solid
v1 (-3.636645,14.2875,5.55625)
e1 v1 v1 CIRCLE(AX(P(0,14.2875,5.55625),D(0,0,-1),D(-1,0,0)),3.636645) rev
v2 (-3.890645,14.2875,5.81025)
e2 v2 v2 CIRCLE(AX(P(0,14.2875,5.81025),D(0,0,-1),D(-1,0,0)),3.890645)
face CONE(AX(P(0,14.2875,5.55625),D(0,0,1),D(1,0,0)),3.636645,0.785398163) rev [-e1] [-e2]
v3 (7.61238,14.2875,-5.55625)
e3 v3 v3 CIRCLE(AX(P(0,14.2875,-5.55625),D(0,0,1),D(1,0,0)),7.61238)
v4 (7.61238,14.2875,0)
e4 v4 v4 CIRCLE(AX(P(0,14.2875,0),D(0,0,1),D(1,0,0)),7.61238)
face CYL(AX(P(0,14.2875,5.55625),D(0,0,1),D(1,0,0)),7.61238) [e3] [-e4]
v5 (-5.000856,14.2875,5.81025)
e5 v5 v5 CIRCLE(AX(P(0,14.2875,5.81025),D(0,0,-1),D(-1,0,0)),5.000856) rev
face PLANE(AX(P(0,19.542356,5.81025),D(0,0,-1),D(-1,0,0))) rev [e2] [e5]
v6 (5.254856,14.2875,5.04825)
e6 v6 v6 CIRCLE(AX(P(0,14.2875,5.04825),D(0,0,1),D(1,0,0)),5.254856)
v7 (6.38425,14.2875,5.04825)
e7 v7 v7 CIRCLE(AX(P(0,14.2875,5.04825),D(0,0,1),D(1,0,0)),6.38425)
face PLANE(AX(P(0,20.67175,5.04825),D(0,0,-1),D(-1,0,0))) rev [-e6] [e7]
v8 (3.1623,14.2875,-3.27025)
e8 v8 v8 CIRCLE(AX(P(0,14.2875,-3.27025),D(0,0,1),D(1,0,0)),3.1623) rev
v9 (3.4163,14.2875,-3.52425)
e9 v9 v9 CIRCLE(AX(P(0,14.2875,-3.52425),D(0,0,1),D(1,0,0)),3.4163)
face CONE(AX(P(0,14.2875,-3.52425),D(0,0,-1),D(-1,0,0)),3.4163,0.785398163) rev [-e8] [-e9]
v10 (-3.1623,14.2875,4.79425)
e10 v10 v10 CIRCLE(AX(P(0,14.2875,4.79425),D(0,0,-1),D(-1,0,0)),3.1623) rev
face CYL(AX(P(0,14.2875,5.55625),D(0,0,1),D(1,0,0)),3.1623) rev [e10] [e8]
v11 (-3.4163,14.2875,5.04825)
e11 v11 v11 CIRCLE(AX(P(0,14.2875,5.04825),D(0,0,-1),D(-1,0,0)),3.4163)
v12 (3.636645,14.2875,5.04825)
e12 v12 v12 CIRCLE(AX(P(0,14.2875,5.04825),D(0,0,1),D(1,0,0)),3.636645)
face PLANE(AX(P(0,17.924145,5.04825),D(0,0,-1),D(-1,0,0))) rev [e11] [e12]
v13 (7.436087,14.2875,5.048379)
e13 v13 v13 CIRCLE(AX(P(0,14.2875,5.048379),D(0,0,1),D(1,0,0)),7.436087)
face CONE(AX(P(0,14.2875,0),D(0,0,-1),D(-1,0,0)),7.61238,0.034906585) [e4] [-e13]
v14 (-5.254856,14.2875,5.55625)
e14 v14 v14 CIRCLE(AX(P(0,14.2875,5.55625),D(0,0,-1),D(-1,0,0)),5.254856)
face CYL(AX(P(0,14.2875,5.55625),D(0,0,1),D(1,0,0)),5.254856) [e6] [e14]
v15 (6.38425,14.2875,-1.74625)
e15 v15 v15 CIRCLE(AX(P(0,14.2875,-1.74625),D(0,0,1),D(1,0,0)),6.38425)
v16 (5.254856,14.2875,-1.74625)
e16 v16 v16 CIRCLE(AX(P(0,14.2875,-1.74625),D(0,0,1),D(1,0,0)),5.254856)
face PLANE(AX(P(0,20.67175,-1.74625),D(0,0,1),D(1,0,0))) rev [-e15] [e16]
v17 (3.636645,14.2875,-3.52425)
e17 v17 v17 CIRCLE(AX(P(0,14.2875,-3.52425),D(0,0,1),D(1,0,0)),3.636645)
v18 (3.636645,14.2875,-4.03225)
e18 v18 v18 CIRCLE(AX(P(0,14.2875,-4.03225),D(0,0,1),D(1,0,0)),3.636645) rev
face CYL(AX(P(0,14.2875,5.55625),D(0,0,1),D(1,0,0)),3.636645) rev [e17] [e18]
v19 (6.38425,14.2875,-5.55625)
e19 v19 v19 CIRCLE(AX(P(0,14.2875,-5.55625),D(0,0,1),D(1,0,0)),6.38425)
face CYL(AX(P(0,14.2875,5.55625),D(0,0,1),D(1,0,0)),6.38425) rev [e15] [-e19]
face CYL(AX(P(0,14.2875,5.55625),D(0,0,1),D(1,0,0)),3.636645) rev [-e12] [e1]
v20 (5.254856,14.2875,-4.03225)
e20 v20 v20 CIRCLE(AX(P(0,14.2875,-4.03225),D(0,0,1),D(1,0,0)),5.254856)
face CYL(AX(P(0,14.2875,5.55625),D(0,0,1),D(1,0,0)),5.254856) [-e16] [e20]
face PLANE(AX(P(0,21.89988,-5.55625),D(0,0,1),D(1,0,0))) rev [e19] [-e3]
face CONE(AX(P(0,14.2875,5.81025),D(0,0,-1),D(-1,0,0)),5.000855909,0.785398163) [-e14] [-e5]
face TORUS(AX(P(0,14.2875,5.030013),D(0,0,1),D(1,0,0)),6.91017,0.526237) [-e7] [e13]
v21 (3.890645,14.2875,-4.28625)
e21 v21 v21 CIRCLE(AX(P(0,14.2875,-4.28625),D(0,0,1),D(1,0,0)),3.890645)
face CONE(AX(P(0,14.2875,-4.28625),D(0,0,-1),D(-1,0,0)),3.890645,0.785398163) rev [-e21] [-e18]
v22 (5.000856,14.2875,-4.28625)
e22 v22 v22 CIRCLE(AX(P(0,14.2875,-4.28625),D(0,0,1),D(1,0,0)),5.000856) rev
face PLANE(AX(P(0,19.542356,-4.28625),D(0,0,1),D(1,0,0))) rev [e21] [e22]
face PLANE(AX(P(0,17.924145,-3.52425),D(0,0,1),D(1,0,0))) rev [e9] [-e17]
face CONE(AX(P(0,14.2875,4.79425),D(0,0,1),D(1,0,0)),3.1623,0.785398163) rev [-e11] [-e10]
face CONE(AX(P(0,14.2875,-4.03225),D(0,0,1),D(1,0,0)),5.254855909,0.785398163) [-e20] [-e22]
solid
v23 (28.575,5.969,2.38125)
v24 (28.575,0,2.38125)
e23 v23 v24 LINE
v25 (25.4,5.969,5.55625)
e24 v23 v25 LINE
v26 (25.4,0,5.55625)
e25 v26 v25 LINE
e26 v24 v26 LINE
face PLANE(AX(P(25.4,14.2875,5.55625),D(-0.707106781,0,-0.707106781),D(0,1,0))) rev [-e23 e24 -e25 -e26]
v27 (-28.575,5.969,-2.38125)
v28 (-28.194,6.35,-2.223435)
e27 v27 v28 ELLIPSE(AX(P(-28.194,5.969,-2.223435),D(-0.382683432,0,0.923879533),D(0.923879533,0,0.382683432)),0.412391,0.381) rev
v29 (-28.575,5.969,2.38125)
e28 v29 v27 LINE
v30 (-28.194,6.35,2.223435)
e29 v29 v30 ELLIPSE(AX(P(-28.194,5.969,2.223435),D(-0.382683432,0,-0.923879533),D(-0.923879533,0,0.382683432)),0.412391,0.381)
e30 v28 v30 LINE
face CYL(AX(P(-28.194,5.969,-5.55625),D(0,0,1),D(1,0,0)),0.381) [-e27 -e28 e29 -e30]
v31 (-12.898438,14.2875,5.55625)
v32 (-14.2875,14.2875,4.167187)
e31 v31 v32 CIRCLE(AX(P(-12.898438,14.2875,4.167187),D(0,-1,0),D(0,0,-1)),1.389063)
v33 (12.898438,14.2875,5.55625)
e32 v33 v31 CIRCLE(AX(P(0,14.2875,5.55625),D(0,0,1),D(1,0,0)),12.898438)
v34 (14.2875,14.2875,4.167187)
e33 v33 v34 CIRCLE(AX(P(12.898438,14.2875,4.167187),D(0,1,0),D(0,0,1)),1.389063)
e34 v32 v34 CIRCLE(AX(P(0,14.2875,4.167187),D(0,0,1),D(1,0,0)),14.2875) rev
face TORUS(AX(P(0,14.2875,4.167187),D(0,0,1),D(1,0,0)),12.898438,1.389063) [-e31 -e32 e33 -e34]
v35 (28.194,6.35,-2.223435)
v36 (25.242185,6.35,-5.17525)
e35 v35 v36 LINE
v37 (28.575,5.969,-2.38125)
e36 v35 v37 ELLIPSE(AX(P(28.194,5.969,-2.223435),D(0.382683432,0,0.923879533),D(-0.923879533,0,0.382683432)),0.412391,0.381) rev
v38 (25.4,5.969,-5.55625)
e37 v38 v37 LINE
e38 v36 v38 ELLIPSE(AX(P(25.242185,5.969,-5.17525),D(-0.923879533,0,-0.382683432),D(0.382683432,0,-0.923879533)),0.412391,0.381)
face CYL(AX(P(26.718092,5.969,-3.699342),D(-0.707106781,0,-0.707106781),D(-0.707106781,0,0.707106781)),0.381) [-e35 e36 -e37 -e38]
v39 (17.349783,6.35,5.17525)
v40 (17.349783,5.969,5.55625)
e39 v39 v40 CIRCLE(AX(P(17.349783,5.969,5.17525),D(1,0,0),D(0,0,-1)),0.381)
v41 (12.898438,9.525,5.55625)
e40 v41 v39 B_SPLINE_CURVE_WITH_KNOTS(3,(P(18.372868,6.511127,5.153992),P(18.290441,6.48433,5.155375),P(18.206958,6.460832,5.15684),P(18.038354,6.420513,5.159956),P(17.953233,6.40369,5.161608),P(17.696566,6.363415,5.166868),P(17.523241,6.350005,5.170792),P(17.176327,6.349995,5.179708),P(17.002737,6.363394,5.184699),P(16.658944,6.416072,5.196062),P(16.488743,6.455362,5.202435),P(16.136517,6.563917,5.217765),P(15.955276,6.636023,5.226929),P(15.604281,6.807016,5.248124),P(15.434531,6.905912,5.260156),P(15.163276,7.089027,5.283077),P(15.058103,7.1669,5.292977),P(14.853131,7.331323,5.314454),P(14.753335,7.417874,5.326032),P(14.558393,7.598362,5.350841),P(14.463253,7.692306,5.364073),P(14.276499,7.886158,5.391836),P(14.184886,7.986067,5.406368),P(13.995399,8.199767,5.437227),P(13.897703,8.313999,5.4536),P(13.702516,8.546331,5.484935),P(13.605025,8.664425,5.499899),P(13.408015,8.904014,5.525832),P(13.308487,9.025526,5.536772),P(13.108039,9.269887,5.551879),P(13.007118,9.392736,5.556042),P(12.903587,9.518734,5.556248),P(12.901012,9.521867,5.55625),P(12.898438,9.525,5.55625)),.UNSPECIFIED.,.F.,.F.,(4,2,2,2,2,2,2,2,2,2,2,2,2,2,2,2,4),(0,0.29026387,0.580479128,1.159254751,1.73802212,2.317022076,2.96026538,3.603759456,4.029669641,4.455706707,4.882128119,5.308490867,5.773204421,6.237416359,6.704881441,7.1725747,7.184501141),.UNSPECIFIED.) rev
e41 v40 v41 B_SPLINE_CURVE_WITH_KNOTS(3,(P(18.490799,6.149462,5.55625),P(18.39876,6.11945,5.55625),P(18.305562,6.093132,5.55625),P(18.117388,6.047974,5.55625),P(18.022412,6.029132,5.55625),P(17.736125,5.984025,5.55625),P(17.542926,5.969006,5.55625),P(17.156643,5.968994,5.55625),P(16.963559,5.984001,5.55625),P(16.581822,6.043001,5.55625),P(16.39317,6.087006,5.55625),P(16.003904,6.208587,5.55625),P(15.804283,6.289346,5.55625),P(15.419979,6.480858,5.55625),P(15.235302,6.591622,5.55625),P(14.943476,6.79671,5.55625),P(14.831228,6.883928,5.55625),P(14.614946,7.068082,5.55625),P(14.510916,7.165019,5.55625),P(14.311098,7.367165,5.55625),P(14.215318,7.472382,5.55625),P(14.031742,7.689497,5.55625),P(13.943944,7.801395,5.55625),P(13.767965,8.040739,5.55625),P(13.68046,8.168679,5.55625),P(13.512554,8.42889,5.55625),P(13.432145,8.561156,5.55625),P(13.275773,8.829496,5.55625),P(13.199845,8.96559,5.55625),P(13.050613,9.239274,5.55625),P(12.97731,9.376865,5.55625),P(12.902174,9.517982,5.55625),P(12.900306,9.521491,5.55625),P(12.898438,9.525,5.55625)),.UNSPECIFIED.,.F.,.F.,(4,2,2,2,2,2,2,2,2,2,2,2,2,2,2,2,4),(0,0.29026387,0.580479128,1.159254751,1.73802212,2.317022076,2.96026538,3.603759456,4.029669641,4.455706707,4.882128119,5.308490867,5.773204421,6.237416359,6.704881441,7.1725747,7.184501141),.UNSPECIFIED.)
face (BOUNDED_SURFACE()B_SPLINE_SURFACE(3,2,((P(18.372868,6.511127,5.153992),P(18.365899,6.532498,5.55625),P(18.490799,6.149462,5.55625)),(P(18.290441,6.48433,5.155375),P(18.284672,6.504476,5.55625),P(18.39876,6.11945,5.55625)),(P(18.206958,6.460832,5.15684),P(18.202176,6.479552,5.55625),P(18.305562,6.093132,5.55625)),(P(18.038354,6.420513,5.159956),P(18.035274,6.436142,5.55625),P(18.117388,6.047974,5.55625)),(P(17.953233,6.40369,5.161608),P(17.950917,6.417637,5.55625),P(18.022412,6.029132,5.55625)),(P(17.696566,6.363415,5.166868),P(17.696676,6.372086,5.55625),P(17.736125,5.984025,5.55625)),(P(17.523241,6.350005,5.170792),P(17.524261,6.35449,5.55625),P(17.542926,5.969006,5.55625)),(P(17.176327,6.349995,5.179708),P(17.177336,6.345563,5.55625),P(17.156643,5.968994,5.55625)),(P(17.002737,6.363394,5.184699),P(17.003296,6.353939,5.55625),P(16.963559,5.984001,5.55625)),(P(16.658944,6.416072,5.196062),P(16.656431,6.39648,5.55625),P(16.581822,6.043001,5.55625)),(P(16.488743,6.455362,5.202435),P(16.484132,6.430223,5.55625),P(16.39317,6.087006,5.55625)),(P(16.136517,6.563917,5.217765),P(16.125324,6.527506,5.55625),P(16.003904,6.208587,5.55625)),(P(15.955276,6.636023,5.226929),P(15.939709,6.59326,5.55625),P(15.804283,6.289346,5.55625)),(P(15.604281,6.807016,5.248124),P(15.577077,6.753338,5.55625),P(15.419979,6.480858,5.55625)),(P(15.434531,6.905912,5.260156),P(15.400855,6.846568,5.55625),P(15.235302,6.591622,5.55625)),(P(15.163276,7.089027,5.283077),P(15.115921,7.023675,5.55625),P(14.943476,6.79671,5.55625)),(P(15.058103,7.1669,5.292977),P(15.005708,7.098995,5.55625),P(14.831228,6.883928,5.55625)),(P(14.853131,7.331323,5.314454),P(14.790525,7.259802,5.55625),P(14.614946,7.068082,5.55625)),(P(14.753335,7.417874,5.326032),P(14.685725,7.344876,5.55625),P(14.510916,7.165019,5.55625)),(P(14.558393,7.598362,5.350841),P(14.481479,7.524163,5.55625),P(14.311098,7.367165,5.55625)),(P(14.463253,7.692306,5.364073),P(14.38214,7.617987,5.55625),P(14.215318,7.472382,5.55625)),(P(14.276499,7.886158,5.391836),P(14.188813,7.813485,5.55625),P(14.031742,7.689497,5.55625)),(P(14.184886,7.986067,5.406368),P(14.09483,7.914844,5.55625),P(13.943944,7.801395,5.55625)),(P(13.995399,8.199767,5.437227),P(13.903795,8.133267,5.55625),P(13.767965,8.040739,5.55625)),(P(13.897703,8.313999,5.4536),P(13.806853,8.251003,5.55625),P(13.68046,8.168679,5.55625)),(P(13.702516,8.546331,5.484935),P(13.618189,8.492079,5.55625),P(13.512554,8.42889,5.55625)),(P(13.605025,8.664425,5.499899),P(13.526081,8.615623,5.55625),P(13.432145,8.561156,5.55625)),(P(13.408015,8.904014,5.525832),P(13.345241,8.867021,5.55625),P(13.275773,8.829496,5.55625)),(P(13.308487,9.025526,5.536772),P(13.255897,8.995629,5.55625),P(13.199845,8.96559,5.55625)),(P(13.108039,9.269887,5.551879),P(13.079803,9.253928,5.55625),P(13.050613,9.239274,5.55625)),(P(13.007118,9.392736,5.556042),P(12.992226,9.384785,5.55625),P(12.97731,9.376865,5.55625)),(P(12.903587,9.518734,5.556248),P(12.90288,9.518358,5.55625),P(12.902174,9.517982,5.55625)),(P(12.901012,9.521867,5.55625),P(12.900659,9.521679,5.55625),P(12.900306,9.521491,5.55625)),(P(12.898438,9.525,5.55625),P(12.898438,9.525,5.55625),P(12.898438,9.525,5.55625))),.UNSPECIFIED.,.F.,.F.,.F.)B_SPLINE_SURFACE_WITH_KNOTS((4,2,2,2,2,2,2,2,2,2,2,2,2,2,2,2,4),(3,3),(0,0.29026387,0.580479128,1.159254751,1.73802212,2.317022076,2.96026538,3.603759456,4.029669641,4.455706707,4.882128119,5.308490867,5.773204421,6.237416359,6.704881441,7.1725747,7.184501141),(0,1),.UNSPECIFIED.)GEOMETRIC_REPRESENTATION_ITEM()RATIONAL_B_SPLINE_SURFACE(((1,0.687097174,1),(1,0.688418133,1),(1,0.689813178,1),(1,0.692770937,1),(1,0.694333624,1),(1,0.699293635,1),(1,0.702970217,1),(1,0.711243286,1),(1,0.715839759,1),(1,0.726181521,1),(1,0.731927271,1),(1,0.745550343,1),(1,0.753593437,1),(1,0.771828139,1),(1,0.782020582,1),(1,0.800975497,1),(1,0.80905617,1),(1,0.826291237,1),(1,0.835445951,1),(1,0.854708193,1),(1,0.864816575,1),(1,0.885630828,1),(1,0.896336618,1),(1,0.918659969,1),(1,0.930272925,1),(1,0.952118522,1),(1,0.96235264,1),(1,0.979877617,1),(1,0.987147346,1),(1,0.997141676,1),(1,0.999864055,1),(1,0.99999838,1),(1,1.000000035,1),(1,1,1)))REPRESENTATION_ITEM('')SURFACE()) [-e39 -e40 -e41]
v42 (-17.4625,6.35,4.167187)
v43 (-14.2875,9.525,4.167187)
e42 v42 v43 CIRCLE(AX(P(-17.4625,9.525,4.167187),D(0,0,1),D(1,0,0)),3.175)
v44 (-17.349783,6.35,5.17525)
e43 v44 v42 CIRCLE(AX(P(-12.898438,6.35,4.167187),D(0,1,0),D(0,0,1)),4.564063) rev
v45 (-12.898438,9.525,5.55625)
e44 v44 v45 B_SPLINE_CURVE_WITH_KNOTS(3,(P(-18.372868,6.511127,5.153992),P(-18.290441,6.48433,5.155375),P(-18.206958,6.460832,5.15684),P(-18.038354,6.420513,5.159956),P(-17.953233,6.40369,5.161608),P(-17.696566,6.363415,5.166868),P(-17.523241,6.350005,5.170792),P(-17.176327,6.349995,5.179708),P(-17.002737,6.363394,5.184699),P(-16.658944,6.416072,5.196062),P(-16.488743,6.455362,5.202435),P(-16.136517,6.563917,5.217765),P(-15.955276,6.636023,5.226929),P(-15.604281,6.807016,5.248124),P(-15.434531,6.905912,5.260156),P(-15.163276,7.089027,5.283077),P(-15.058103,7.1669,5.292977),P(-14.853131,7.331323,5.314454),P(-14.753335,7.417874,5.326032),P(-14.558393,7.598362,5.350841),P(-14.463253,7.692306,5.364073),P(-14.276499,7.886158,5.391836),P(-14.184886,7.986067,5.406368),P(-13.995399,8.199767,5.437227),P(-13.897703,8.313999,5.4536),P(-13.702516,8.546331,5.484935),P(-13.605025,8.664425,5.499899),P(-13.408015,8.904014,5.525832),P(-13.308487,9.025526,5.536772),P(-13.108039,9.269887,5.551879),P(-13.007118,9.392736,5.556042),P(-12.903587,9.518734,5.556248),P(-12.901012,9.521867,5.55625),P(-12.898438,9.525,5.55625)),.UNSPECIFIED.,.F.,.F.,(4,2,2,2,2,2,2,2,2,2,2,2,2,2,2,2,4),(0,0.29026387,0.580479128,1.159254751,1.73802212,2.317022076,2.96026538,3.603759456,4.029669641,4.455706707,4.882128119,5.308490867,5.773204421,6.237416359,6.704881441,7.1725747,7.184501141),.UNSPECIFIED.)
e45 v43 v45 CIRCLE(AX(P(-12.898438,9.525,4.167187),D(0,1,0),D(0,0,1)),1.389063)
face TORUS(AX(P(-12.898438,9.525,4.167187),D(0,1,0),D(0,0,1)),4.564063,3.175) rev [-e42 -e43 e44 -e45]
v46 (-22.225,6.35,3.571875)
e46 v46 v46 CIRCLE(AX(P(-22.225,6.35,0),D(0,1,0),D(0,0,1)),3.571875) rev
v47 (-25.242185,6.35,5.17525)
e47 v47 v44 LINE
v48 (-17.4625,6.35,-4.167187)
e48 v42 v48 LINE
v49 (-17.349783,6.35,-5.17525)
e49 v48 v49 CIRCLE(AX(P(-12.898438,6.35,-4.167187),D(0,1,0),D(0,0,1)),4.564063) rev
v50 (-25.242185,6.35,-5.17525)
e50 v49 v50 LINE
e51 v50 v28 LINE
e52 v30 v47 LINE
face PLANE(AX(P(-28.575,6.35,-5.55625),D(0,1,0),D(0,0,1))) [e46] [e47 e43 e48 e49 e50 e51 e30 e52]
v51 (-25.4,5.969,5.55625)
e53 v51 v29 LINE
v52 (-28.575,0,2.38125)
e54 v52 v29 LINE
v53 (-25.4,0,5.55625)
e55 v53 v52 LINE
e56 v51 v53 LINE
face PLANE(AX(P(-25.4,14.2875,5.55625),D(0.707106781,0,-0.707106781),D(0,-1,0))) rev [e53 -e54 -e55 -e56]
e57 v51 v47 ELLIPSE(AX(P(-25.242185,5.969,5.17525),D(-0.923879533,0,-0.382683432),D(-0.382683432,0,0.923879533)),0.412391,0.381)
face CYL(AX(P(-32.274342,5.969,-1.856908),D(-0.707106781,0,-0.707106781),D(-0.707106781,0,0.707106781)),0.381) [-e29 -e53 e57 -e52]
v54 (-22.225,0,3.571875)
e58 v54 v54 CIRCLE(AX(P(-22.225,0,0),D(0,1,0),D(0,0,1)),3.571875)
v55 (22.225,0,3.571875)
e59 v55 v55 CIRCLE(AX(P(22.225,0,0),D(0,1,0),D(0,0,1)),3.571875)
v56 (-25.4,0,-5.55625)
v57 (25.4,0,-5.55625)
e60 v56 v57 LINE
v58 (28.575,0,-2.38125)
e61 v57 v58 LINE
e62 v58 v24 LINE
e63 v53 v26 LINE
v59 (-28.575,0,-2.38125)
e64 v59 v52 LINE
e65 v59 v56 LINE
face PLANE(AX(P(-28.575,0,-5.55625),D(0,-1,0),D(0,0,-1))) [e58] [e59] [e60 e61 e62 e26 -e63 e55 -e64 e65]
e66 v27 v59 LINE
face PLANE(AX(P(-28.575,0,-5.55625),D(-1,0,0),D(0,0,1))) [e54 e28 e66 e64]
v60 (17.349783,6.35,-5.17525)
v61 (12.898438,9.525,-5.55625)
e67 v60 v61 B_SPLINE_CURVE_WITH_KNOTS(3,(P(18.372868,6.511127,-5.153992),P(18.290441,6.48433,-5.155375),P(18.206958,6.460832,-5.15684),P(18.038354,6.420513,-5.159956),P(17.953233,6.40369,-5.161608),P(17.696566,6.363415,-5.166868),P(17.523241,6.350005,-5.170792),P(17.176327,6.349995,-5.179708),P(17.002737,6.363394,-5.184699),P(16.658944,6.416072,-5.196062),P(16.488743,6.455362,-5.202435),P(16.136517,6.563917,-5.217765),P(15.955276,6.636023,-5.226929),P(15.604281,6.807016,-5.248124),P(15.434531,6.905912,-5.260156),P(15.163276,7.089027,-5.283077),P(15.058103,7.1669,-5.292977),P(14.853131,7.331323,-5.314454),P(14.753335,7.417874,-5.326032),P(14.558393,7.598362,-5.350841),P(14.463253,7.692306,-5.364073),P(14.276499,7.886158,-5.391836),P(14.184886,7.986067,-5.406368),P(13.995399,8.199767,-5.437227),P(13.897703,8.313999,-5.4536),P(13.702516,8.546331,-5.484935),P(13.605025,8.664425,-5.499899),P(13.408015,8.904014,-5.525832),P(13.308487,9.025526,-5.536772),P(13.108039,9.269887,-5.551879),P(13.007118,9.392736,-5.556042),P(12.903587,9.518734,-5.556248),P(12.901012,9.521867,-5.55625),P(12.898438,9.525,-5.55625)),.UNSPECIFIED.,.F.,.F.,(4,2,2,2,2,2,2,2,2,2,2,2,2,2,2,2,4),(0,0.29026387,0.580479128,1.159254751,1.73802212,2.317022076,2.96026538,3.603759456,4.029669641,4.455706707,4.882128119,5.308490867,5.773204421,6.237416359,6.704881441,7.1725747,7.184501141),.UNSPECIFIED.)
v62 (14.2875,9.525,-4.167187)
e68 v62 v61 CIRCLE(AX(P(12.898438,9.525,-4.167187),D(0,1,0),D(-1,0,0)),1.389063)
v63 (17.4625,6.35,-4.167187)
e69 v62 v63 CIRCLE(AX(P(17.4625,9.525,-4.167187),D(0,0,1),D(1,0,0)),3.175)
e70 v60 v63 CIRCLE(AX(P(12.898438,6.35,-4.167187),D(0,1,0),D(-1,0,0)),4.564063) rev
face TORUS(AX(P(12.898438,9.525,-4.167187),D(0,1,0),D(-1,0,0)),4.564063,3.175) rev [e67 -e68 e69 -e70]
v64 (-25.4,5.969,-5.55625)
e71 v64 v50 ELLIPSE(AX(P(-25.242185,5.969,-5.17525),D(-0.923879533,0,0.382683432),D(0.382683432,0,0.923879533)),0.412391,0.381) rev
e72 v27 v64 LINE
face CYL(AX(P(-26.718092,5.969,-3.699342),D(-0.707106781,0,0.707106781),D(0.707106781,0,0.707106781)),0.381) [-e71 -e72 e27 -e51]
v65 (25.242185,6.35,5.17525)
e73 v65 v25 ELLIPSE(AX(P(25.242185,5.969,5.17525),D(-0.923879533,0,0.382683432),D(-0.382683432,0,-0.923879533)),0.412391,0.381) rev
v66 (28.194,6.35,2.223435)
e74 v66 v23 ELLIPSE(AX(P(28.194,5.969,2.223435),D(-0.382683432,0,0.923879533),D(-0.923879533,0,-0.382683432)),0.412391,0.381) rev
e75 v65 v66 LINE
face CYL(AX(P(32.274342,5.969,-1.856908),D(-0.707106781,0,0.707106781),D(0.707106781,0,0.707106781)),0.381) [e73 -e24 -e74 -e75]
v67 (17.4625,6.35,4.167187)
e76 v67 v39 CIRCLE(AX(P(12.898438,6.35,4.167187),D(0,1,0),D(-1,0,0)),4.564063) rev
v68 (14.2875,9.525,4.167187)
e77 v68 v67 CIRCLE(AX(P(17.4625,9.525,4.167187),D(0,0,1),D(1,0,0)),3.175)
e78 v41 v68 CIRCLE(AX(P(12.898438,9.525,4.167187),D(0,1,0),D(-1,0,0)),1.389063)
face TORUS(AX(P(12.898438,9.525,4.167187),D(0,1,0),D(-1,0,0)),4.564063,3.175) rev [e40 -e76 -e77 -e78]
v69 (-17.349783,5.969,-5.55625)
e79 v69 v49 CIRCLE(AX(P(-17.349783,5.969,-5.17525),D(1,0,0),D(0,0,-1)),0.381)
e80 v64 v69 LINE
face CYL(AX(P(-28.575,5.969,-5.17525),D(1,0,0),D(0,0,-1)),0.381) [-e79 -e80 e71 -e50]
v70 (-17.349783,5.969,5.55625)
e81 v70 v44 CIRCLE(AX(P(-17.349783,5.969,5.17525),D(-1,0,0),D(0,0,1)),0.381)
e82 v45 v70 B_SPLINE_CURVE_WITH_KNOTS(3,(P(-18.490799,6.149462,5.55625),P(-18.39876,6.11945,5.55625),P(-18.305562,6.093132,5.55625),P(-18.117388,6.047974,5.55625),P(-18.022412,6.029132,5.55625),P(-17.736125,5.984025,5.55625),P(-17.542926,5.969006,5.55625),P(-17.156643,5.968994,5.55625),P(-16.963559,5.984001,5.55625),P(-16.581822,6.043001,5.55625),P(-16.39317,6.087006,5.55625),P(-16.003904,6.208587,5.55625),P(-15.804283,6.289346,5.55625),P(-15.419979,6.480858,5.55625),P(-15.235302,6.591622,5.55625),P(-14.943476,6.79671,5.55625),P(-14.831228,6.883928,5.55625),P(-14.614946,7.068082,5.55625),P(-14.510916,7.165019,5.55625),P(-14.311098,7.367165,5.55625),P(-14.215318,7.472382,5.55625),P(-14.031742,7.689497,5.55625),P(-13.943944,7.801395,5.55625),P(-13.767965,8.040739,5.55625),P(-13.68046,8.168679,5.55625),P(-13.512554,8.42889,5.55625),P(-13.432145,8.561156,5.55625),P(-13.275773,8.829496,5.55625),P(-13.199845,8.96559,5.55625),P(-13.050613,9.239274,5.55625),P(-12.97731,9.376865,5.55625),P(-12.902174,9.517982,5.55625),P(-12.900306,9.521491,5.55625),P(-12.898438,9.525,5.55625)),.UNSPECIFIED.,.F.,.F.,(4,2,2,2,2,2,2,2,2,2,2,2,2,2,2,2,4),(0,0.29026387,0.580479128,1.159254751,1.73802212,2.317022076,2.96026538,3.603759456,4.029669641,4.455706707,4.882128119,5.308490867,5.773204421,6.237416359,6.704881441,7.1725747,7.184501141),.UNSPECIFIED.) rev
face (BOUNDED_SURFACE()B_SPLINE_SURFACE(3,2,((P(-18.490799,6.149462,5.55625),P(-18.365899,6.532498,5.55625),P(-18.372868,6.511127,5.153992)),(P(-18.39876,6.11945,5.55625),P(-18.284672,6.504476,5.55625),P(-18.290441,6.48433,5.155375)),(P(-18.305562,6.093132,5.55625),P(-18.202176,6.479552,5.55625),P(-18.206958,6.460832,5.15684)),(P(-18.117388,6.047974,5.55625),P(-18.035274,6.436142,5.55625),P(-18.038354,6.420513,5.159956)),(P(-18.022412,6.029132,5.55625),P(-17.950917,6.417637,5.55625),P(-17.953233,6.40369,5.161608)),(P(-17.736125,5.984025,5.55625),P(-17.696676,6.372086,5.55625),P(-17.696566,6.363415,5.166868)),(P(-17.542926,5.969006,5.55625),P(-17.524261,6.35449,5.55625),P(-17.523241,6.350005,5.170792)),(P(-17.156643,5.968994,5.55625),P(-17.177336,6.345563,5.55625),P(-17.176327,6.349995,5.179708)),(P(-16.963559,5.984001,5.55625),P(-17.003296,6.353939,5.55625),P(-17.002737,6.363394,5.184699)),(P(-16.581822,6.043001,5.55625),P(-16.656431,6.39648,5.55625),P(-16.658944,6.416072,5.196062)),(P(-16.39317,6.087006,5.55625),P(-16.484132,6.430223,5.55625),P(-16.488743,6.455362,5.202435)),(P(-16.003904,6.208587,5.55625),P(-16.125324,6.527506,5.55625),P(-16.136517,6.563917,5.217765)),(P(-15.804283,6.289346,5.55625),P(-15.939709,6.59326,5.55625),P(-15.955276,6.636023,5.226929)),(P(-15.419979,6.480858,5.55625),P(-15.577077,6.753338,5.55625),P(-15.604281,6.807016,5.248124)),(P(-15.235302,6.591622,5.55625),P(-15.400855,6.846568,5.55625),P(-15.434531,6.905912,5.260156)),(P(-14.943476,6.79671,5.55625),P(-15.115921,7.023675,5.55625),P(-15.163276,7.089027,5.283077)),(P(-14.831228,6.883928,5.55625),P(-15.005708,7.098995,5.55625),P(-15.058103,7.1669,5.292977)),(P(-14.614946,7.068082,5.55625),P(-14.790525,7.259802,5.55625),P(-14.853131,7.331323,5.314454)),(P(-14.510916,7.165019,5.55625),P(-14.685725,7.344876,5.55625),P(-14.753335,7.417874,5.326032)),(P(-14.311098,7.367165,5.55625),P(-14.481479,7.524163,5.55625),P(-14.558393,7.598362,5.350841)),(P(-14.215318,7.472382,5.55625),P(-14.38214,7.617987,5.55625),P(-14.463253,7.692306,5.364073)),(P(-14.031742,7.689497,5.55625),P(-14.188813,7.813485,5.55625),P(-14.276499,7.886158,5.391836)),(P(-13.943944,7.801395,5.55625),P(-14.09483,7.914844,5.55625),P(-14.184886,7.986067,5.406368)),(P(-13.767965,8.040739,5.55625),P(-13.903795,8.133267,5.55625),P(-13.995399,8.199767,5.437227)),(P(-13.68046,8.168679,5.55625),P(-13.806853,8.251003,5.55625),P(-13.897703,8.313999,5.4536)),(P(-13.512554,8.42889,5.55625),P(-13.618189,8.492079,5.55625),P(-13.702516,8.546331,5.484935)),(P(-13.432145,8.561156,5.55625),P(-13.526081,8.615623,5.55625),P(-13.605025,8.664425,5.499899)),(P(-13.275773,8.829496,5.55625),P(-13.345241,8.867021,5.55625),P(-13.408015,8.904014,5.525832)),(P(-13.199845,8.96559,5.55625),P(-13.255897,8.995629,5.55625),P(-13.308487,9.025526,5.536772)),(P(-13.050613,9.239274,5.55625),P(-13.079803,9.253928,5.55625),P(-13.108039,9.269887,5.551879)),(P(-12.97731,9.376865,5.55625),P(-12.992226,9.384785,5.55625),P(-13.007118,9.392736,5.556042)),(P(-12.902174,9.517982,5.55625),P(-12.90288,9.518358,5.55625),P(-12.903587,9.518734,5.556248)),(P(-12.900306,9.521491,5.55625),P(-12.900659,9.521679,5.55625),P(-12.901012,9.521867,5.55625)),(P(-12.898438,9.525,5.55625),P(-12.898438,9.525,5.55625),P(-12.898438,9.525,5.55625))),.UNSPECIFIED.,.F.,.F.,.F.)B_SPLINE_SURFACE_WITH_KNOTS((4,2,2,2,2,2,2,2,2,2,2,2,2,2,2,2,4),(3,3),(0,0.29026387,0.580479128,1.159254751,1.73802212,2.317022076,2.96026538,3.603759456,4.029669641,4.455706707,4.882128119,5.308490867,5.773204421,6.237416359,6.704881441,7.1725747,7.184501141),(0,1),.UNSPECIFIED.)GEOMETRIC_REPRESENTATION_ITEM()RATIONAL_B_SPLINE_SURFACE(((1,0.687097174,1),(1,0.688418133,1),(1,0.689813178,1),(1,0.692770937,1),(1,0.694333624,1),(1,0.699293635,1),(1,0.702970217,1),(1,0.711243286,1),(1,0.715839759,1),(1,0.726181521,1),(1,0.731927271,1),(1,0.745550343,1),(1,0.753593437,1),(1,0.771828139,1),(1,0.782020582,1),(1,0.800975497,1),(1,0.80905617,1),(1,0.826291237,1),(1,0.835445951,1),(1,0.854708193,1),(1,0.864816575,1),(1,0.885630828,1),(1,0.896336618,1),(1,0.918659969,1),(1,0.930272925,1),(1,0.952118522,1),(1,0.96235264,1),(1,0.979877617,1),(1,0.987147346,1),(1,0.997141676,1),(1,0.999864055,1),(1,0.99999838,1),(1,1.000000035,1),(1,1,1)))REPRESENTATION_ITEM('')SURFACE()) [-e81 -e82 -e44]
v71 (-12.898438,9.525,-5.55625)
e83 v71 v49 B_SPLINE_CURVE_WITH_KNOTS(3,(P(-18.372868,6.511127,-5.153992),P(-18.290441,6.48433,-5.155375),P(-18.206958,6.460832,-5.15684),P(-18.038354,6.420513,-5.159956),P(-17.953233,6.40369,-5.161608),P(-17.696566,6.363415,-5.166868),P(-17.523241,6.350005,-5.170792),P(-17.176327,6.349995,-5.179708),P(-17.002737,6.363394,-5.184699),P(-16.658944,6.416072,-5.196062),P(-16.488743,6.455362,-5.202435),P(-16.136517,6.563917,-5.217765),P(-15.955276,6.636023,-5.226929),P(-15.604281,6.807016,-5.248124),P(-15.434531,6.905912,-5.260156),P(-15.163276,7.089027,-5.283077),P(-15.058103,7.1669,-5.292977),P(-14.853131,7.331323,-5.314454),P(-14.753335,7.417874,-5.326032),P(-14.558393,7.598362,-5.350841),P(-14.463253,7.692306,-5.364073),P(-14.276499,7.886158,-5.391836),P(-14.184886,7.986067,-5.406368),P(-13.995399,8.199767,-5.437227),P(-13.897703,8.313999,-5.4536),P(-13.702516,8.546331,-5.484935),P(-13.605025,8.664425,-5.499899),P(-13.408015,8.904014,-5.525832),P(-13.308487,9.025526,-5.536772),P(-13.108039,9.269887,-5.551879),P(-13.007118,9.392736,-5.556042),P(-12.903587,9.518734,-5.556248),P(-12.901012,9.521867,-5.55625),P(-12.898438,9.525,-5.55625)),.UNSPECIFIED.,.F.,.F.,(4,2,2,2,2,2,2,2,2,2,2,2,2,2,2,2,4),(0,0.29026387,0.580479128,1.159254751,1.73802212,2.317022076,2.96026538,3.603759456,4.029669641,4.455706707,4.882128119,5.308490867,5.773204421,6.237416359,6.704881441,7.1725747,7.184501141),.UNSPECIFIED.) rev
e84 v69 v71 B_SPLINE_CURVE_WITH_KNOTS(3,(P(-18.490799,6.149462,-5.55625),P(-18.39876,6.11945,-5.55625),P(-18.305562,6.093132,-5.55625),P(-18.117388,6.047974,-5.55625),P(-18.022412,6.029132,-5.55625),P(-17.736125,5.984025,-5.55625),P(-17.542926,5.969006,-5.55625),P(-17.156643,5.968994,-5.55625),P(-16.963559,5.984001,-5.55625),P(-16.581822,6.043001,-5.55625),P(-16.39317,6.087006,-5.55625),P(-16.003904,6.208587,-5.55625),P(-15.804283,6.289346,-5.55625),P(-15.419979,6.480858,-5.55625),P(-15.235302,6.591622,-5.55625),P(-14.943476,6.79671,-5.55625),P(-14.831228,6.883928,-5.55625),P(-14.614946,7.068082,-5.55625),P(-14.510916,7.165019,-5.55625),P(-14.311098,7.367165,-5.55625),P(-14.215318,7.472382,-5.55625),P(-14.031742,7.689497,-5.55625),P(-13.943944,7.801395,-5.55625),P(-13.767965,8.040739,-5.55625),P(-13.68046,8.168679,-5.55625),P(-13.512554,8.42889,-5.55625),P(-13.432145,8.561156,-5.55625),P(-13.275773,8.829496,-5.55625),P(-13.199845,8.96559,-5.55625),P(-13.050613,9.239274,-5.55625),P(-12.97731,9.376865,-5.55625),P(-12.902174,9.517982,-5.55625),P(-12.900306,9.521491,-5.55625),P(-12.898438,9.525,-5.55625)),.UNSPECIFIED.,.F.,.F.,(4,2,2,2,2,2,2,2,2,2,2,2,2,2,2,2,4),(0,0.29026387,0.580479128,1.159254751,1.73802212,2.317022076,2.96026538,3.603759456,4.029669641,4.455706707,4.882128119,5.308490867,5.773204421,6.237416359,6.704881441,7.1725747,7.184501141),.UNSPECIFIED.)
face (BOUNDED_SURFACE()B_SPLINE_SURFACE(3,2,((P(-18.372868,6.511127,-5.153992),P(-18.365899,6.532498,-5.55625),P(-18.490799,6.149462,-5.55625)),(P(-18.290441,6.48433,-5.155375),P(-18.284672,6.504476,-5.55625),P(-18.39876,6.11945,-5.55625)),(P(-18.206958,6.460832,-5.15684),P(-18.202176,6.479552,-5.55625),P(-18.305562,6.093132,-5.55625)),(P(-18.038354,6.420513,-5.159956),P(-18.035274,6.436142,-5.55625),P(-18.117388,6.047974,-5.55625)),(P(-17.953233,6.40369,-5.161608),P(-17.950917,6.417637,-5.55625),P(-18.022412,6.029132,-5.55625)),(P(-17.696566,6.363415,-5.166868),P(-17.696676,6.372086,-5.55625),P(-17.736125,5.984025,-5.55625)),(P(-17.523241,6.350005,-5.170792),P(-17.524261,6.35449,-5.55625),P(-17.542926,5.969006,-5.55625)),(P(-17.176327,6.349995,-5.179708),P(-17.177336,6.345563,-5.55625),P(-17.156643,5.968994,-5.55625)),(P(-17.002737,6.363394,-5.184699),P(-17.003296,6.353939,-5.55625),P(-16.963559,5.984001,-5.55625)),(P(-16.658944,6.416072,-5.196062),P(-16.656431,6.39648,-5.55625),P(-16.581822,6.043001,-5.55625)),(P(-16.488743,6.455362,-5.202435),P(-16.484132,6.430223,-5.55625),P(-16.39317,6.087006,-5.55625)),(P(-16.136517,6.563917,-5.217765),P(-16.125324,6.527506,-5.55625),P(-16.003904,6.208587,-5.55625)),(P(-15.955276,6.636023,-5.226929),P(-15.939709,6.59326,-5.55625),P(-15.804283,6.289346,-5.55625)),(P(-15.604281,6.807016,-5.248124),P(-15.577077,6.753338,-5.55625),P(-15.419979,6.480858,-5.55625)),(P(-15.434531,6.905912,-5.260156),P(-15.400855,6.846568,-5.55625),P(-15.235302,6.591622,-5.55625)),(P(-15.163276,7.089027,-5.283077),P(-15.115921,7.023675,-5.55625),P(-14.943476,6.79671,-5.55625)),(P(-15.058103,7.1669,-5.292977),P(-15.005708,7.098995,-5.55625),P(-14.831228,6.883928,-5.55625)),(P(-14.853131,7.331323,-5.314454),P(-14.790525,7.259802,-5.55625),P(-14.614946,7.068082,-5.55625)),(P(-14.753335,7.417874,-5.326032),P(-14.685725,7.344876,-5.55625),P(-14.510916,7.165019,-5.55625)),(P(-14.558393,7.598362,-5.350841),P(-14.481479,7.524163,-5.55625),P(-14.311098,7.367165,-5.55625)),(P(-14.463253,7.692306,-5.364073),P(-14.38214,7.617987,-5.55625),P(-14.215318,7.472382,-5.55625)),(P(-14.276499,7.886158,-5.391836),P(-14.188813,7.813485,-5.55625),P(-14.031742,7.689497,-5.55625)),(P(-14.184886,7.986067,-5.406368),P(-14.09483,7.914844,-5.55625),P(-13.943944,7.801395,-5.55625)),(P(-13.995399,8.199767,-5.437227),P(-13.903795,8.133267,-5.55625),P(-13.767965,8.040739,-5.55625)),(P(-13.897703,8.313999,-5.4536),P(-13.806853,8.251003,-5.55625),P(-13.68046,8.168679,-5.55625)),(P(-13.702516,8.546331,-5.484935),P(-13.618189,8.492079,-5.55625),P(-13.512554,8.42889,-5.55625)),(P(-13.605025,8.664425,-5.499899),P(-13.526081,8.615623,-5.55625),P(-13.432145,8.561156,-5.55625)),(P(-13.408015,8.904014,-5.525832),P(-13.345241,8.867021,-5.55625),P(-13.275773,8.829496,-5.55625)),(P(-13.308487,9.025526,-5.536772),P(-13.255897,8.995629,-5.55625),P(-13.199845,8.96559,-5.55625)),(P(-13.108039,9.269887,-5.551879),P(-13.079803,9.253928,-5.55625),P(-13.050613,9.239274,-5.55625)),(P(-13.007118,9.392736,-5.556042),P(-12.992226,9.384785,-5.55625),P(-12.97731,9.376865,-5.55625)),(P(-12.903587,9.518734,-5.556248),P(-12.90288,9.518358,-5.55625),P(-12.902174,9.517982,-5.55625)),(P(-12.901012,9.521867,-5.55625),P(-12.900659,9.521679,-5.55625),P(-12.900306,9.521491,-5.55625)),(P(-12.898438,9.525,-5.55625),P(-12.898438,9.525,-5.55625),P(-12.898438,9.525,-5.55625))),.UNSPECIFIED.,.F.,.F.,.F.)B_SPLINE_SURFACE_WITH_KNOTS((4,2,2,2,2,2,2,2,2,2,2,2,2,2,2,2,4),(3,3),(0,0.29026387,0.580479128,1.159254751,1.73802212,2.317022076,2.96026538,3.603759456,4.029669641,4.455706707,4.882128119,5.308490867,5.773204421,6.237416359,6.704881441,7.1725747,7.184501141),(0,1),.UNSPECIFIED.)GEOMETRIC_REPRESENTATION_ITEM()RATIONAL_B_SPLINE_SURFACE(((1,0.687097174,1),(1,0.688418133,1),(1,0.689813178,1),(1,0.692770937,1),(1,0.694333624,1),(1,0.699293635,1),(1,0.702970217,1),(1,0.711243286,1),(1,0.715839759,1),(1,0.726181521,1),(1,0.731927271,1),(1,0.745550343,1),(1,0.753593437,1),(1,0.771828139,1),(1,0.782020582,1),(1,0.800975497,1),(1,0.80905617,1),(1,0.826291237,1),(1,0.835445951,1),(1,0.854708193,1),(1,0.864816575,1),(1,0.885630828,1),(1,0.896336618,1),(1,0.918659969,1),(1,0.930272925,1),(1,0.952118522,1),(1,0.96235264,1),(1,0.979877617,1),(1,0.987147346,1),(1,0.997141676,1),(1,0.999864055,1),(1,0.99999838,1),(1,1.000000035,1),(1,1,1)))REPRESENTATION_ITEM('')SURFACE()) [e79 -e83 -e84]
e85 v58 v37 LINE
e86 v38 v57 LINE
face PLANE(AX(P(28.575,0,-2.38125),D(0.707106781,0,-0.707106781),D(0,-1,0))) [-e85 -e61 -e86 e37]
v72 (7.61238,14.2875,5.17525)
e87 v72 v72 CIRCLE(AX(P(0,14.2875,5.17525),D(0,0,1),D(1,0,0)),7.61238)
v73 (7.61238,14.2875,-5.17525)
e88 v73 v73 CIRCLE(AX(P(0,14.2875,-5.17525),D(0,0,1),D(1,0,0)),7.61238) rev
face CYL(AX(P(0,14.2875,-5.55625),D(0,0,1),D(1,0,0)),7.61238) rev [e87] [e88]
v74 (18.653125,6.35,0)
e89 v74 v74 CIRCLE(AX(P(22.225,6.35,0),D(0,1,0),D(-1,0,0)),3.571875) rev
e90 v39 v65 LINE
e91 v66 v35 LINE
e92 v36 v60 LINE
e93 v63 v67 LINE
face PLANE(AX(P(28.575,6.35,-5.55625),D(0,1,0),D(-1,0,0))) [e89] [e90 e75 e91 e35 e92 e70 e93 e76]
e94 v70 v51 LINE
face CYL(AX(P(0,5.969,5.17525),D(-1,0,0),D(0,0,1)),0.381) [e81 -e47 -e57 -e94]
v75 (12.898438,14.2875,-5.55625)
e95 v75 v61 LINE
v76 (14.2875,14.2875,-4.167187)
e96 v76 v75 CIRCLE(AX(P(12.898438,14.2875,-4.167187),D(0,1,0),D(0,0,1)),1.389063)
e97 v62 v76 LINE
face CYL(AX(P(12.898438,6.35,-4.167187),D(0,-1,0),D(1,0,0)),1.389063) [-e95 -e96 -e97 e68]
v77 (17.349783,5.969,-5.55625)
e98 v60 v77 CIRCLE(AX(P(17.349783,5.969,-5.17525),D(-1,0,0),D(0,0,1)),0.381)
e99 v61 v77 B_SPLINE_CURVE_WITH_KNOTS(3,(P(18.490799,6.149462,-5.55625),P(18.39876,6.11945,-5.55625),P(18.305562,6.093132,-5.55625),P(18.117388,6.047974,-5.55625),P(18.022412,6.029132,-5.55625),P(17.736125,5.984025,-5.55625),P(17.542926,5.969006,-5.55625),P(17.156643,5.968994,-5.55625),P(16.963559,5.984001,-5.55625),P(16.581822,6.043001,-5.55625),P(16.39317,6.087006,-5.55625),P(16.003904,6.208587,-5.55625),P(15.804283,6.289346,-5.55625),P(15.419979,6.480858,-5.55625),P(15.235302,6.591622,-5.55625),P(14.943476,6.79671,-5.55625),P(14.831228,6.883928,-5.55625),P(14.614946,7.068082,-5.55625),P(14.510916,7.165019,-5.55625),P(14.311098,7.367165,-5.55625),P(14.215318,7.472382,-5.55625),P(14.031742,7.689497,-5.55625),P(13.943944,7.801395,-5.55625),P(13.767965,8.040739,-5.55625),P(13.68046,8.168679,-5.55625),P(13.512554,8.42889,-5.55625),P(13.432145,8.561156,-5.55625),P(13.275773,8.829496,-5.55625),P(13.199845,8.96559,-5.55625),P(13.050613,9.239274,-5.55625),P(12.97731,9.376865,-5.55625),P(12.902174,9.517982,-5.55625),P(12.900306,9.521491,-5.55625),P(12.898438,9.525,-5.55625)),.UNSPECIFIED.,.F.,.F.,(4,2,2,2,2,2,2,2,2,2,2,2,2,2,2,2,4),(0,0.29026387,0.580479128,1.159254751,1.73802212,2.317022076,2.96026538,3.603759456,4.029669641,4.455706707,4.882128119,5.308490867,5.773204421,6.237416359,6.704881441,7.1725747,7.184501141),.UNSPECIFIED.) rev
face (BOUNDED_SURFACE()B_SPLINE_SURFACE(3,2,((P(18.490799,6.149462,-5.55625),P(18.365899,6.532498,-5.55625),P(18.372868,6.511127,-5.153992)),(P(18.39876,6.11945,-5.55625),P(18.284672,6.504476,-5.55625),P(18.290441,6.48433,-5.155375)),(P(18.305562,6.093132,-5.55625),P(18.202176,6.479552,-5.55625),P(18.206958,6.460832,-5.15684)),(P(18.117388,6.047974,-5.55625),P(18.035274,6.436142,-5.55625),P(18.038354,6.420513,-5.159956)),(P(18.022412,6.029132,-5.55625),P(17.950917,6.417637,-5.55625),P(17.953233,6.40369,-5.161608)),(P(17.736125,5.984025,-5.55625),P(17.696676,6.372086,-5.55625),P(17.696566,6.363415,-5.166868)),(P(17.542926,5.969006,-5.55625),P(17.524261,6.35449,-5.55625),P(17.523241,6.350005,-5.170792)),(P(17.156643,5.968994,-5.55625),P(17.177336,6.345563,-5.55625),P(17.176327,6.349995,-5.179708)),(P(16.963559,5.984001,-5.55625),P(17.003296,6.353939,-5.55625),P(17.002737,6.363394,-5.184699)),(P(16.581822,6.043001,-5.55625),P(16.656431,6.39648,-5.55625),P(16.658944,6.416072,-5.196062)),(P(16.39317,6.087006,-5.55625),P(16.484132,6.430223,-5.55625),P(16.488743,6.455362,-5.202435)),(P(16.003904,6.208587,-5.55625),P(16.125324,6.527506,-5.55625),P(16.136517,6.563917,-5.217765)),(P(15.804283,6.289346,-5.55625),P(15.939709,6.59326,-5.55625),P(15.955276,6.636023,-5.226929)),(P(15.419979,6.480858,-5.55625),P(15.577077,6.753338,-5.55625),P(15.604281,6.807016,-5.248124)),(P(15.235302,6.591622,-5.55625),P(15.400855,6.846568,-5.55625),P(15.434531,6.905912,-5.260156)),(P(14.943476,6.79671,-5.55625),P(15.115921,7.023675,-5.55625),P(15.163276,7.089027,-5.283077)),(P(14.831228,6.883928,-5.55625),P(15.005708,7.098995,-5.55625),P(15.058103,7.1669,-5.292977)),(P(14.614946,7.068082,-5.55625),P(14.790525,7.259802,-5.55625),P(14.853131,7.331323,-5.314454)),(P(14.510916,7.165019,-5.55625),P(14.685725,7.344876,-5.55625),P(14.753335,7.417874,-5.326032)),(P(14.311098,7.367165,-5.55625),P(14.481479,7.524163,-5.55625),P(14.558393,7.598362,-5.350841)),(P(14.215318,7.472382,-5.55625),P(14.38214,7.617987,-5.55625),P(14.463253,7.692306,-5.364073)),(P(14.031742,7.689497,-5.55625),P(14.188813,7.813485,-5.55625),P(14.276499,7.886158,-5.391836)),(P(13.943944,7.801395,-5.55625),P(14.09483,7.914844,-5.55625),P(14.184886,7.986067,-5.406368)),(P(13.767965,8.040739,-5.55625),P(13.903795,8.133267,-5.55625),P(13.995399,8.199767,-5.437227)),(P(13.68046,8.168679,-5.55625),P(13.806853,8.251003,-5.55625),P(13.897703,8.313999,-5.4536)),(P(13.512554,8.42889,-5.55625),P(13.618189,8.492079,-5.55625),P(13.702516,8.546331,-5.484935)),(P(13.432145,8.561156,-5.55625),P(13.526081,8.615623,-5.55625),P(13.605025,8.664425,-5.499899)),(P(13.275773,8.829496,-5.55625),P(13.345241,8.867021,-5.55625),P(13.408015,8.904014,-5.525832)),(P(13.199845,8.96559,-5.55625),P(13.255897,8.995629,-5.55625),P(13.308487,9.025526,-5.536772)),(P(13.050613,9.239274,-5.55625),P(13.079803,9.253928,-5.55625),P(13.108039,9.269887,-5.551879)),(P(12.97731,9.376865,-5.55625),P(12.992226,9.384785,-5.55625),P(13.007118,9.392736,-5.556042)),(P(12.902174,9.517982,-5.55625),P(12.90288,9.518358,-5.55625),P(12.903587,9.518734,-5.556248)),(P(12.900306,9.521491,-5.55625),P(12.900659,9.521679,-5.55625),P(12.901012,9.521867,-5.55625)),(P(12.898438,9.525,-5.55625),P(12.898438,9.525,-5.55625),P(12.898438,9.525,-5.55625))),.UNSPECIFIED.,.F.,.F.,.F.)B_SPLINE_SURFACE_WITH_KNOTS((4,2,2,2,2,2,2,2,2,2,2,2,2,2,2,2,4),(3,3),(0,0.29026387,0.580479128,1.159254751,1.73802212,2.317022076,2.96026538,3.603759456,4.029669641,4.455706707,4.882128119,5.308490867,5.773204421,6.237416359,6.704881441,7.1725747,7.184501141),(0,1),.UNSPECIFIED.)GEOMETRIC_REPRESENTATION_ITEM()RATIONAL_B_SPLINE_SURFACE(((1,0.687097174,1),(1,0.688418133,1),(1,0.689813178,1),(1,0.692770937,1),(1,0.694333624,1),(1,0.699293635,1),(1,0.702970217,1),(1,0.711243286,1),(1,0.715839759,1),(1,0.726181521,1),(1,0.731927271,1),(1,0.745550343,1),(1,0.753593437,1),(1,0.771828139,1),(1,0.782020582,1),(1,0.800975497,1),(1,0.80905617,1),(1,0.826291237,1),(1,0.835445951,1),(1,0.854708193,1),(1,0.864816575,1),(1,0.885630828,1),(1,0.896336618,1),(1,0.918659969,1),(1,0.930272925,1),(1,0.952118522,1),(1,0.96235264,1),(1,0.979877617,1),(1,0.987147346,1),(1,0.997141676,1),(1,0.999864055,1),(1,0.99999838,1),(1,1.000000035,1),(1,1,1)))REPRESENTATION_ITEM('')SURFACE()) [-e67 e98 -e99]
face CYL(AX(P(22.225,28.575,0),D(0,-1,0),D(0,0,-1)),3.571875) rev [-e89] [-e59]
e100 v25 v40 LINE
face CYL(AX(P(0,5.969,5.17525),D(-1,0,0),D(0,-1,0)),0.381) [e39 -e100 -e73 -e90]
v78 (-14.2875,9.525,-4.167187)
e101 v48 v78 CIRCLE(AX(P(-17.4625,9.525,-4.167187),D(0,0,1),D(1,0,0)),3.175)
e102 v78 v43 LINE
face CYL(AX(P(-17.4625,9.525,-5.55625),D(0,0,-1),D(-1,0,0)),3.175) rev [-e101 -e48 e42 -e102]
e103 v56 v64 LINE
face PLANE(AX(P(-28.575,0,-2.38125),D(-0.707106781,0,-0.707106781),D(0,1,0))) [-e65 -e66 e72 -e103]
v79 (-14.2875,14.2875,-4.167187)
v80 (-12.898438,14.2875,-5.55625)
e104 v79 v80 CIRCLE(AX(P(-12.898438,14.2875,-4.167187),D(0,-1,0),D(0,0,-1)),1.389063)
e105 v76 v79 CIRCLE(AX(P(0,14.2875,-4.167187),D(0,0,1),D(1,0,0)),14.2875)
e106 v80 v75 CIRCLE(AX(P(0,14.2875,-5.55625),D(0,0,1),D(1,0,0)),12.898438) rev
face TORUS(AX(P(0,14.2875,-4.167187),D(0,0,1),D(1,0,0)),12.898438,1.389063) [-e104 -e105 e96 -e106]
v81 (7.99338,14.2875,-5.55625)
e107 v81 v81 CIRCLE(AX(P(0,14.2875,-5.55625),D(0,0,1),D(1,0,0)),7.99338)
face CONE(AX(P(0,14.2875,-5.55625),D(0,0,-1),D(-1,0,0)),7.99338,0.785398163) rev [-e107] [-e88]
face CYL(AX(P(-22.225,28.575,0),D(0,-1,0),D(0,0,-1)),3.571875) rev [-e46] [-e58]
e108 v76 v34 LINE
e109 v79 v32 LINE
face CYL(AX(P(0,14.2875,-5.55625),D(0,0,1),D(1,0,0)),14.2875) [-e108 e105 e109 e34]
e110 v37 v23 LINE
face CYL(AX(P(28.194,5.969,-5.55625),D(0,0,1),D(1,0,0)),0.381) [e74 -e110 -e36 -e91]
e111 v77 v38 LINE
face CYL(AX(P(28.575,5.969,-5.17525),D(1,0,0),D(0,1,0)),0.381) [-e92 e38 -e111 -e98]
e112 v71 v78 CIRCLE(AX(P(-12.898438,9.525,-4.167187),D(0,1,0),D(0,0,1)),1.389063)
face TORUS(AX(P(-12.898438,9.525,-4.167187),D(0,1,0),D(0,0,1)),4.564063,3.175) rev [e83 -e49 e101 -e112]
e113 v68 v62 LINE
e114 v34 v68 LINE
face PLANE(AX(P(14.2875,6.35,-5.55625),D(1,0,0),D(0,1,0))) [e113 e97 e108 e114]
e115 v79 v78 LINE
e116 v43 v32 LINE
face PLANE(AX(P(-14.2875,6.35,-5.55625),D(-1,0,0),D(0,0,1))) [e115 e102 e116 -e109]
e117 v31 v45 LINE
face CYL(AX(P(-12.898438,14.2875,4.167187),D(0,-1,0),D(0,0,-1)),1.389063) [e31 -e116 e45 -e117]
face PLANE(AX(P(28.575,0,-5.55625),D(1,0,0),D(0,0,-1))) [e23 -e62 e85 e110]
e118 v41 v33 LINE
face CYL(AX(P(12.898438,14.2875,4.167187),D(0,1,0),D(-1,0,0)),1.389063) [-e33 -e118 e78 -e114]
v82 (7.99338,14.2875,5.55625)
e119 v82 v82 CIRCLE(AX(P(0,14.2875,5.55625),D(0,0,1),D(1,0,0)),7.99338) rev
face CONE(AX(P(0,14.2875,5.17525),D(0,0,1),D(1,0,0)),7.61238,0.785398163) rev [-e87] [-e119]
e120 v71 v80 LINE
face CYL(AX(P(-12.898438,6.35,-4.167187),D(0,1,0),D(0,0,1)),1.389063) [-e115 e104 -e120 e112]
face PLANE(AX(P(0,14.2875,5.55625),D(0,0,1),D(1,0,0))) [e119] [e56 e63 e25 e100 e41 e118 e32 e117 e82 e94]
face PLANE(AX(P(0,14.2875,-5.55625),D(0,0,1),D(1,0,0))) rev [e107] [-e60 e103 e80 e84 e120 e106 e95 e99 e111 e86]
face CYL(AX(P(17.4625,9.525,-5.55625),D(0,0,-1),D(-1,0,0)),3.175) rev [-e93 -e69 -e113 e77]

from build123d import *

# Parameters (mm, degrees)
BOSS_EXTRUDE1_DEPTH      = 5.55625
BOSS_EXTRUDE1_DEPTH_BACK = 5.55625
SKETCH3_R                = 7.61238
SKETCH4_R                = 3.571875
CUT_EXTRUDE1_DEPTH       = 41.791336875
CHAMFER1_SIZE            = 3.175
FILLET1_R                = 1.3890625
FILLET2_R                = 3.175
CHAMFER2_SIZE            = 0.381
FILLET3_R                = 0.381
CHAMFER3_SIZE            = 0.254


with BuildPart() as part:
    # Sketch3 → Boss-Extrude1 (new, two sides: drawn at the far end of the back side and taken through both)
    with BuildSketch(Plane.XY.offset(-BOSS_EXTRUDE1_DEPTH_BACK)):
        with BuildLine():
            Line((-28.575, 0), (-28.575, 6.35))
            Line((-28.575, 6.35), (-14.2875, 6.35))
            Line((-14.2875, 6.35), (-14.2875, 14.2875))
            ThreePointArc((-14.2875, 14.2875), (0, 28.575), (14.2875, 14.2875))
            Line((14.2875, 14.2875), (14.2875, 6.35))
            Line((14.2875, 6.35), (28.575, 6.35))
            Line((28.575, 6.35), (28.575, 0))
            Line((28.575, 0), (-28.575, 0))
        make_face()
        with Locations((0, 14.2875)):
            Circle(SKETCH3_R, mode=Mode.SUBTRACT)
    extrude(amount=BOSS_EXTRUDE1_DEPTH + BOSS_EXTRUDE1_DEPTH_BACK)

    # Sketch4 → Cut-Extrude1 (cut, through all)
    with BuildSketch(Plane(origin=(0, 0, 0), x_dir=(1, 0, 0), z_dir=(0, 1, 0))):
        with Locations(Location((-22.225, 0, 0), (0, 0, 270))):
            Circle(SKETCH4_R)
        with Locations(Location((22.225, 0, 0), (0, 0, 180))):
            Circle(SKETCH4_R)
    extrude(amount=CUT_EXTRUDE1_DEPTH, mode=Mode.SUBTRACT)

    # Chamfer1
    chamfer1_edges = [part.edges().sort_by_distance(p)[0] for p in [
        (28.575, 3.175, 5.55625),
        (-28.575, 3.175, -5.55625),
        (-28.575, 3.175, 5.55625),
        (28.575, 3.175, -5.55625),
    ]]
    chamfer(chamfer1_edges, length=CHAMFER1_SIZE)

    # Fillet1
    fillet1_edges = [part.edges().sort_by_distance(p)[0] for p in [
        (14.2875, 10.31875, -5.55625),
        (0, 28.575, -5.55625),
        (-14.2875, 10.31875, -5.55625),
        (14.2875, 10.31875, 5.55625),
        (0, 28.575, 5.55625),
        (-14.2875, 10.31875, 5.55625),
    ]]
    fillet(fillet1_edges, radius=FILLET1_R)

    # Fillet2
    # the kernel refuses this fillet: 3.175 mm, written as the material it adds along each edge
    with BuildSketch(Plane(origin=(-14.2875, 6.35, 4.1671875), x_dir=(-1, 0, 0), z_dir=(0, 0, -1))) as fillet2_piece_1:
        with BuildLine():
            CenterArc((FILLET2_R, FILLET2_R), FILLET2_R, 180, 90)
            Line((0, FILLET2_R), (0, 0))
            Line((0, 0), (FILLET2_R, 0))
        make_face()
    extrude(amount=8.334375)
    with BuildSketch(Plane(origin=(14.2875, 6.35, 4.1671875), x_dir=(1, 0, 0), z_dir=(0, 0, -1))) as fillet2_piece_2:
        with BuildLine():
            CenterArc((FILLET2_R, -FILLET2_R), FILLET2_R, 90, 90)
            Line((0, -FILLET2_R), (0, 0))
            Line((0, 0), (FILLET2_R, 0))
        make_face()
    extrude(amount=8.334375)
    with BuildSketch(Plane(origin=(-12.8984375, 6.35, -4.1671875), x_dir=(-0.9999802608561372, 0, 0.00628314396555953), z_dir=(-0.00628314396555953, 0, -0.9999802608561372))) as fillet2_piece_3_section:
        with BuildLine():
            CenterArc((-1.3890625 - FILLET2_R, FILLET2_R), FILLET2_R, 270, 90)
            Line((-1.3890625, FILLET2_R), (-1.3890625, 0))
            Line((-1.3890625, 0), (-1.3890625 - FILLET2_R, 0))
        make_face()
    fillet2_piece_3 = revolve(axis=Axis((-12.8984375, 6.35, -4.1671875), (0, 1, 0)), revolution_arc=359.64, mode=Mode.PRIVATE)
    fillet2_piece_3 = split(fillet2_piece_3, bisect_by=Plane(origin=(-13.956394306, 7.50373211, -5.55625), z_dir=(0, 0, 1)), keep=Keep.TOP, mode=Mode.PRIVATE)
    add(fillet2_piece_3)
    with BuildSketch(Plane(origin=(-12.8984375, 6.35, 4.1671875), x_dir=(-0.9999802608561372, 0, -0.00628314396555953), z_dir=(-0.00628314396555953, 0, 0.9999802608561372))) as fillet2_piece_4_section:
        with BuildLine():
            CenterArc((-1.3890625 - FILLET2_R, -FILLET2_R), FILLET2_R, 0, 90)
            Line((-1.3890625, -FILLET2_R), (-1.3890625, 0))
            Line((-1.3890625, 0), (-1.3890625 - FILLET2_R, 0))
        make_face()
    fillet2_piece_4 = revolve(axis=Axis((-12.8984375, 6.35, 4.1671875), (0, -1, 0)), revolution_arc=359.64, mode=Mode.PRIVATE)
    fillet2_piece_4 = split(fillet2_piece_4, bisect_by=Plane(origin=(-13.956394306, 7.50373211, 5.55625), z_dir=(0, 0, -1)), keep=Keep.TOP, mode=Mode.PRIVATE)
    add(fillet2_piece_4)
    with BuildSketch(Plane(origin=(12.8984375, 6.35, -4.1671875), x_dir=(0.9999802608561372, 0, 0.006283143965558251), z_dir=(0.006283143965558251, 0, -0.9999802608561372))) as fillet2_piece_5_section:
        with BuildLine():
            CenterArc((-1.3890625 - FILLET2_R, -FILLET2_R), FILLET2_R, 360, 90)
            Line((-1.3890625, -FILLET2_R), (-1.3890625, 0))
            Line((-1.3890625, 0), (-1.3890625 - FILLET2_R, 0))
        make_face()
    fillet2_piece_5 = revolve(axis=Axis((12.8984375, 6.35, -4.1671875), (0, -1, 0)), revolution_arc=359.64, mode=Mode.PRIVATE)
    fillet2_piece_5 = split(fillet2_piece_5, bisect_by=Plane(origin=(13.956394279, 7.503732405, -5.55625), z_dir=(0, 0, 1)), keep=Keep.TOP, mode=Mode.PRIVATE)
    add(fillet2_piece_5)
    with BuildSketch(Plane(origin=(12.8984375, 6.35, 4.1671875), x_dir=(0.9999802608561372, 0, -0.006283143965558251), z_dir=(0.006283143965558251, 0, 0.9999802608561372))) as fillet2_piece_6_section:
        with BuildLine():
            CenterArc((-1.3890625 - FILLET2_R, FILLET2_R), FILLET2_R, 270, 90)
            Line((-1.3890625, FILLET2_R), (-1.3890625, 0))
            Line((-1.3890625, 0), (-1.3890625 - FILLET2_R, 0))
        make_face()
    fillet2_piece_6 = revolve(axis=Axis((12.8984375, 6.35, 4.1671875), (0, 1, 0)), revolution_arc=359.64, mode=Mode.PRIVATE)
    fillet2_piece_6 = split(fillet2_piece_6, bisect_by=Plane(origin=(13.956394279, 7.503732405, 5.55625), z_dir=(0, 0, -1)), keep=Keep.TOP, mode=Mode.PRIVATE)
    add(fillet2_piece_6)

    # Chamfer2
    chamfer2_edges = [part.edges().sort_by_distance(p)[0] for p in [
        (-7.61238, 14.2875, -5.55625),
        (-7.61238, 14.2875, 5.55625),
    ]]
    chamfer(chamfer2_edges, length=CHAMFER2_SIZE)

    # Fillet3
    fillet3_edges = [part.edges().sort_by_distance(p)[0] for p in [
        (-21.32299265, 6.35, -5.55625),
        (-21.32299265, 6.35, 5.55625),
        (-14.671838579, 7.348302589, -5.55625),
        (-14.67183858, 7.348302588, 5.55625),
        (14.67183858, 7.348302588, -5.55625),
        (14.671838579, 7.348302589, 5.55625),
        (-28.575, 6.35, 0),
        (21.32299265, 6.35, -5.55625),
        (-26.9875, 6.35, 3.96875),
        (-26.9875, 6.35, -3.96875),
        (21.32299265, 6.35, 5.55625),
        (28.575, 6.35, 0),
        (26.9875, 6.35, -3.96875),
        (26.9875, 6.35, 3.96875),
    ]]
    fillet(fillet3_edges, radius=FILLET3_R)


with BuildPart() as body_2:
    # Sketch6 → Revolve1 (revolve)
    with BuildSketch(Plane(origin=(0, 0, 0), x_dir=(0, 0, -1), z_dir=(1, 0, 0)), mode=Mode.PRIVATE) as revolve1_sk:
        with BuildLine():
            Line((0, 21.89988), (5.55625, 21.89988))
            Line((5.55625, 21.89988), (5.55625, 20.671749646))
            Line((5.55625, 20.671749646), (1.74625, 20.671749646))
            Line((1.74625, 20.671749646), (1.74625, 19.542355909))
            Line((1.74625, 19.542355909), (4.28625, 19.542355909))
            Line((4.28625, 19.542355909), (4.28625, 17.924145))
            Line((4.28625, 17.924145), (3.52425, 17.924145))
            Line((3.52425, 17.924145), (3.52425, 17.4498))
            Line((3.52425, 17.4498), (-5.04825, 17.4498))
            Line((-5.04825, 17.4498), (-5.04825, 17.924145))
            Line((-5.04825, 17.924145), (-5.81025, 17.924145))
            Line((-5.81025, 17.924145), (-5.81025, 19.542355909))
            Line((-5.81025, 19.542355909), (-5.04825, 19.542355909))
            Line((-5.04825, 19.542355909), (-5.04825, 20.671749646))
            ThreePointArc((-5.04825, 20.671749646), (-5.556249996, 21.197606127), (-5.048378524, 21.723586737))
            Line((-5.048378524, 21.723586737), (0, 21.89988))
        make_face()
    revolve(revolve1_sk.sketch.rotate(Axis((0, 14.2875, 5.55625), (0, 0, -1)), 90), axis=Axis((0, 14.2875, 5.55625), (0, 0, -1)))

    # Chamfer3
    chamfer3_edges = [body_2.edges().sort_by_distance(p)[0] for p in [
        (-5.254855909, 14.2875, -4.28625),
        (-3.636645, 14.2875, -4.28625),
        (-3.1623, 14.2875, -3.52425),
        (-3.1623, 14.2875, 5.04825),
        (-3.636645, 14.2875, 5.81025),
        (-5.254855909, 14.2875, 5.81025),
    ]]
    chamfer(chamfer3_edges, length=CHAMFER3_SIZE)


solid = Compound([part.part, body_2.part])
